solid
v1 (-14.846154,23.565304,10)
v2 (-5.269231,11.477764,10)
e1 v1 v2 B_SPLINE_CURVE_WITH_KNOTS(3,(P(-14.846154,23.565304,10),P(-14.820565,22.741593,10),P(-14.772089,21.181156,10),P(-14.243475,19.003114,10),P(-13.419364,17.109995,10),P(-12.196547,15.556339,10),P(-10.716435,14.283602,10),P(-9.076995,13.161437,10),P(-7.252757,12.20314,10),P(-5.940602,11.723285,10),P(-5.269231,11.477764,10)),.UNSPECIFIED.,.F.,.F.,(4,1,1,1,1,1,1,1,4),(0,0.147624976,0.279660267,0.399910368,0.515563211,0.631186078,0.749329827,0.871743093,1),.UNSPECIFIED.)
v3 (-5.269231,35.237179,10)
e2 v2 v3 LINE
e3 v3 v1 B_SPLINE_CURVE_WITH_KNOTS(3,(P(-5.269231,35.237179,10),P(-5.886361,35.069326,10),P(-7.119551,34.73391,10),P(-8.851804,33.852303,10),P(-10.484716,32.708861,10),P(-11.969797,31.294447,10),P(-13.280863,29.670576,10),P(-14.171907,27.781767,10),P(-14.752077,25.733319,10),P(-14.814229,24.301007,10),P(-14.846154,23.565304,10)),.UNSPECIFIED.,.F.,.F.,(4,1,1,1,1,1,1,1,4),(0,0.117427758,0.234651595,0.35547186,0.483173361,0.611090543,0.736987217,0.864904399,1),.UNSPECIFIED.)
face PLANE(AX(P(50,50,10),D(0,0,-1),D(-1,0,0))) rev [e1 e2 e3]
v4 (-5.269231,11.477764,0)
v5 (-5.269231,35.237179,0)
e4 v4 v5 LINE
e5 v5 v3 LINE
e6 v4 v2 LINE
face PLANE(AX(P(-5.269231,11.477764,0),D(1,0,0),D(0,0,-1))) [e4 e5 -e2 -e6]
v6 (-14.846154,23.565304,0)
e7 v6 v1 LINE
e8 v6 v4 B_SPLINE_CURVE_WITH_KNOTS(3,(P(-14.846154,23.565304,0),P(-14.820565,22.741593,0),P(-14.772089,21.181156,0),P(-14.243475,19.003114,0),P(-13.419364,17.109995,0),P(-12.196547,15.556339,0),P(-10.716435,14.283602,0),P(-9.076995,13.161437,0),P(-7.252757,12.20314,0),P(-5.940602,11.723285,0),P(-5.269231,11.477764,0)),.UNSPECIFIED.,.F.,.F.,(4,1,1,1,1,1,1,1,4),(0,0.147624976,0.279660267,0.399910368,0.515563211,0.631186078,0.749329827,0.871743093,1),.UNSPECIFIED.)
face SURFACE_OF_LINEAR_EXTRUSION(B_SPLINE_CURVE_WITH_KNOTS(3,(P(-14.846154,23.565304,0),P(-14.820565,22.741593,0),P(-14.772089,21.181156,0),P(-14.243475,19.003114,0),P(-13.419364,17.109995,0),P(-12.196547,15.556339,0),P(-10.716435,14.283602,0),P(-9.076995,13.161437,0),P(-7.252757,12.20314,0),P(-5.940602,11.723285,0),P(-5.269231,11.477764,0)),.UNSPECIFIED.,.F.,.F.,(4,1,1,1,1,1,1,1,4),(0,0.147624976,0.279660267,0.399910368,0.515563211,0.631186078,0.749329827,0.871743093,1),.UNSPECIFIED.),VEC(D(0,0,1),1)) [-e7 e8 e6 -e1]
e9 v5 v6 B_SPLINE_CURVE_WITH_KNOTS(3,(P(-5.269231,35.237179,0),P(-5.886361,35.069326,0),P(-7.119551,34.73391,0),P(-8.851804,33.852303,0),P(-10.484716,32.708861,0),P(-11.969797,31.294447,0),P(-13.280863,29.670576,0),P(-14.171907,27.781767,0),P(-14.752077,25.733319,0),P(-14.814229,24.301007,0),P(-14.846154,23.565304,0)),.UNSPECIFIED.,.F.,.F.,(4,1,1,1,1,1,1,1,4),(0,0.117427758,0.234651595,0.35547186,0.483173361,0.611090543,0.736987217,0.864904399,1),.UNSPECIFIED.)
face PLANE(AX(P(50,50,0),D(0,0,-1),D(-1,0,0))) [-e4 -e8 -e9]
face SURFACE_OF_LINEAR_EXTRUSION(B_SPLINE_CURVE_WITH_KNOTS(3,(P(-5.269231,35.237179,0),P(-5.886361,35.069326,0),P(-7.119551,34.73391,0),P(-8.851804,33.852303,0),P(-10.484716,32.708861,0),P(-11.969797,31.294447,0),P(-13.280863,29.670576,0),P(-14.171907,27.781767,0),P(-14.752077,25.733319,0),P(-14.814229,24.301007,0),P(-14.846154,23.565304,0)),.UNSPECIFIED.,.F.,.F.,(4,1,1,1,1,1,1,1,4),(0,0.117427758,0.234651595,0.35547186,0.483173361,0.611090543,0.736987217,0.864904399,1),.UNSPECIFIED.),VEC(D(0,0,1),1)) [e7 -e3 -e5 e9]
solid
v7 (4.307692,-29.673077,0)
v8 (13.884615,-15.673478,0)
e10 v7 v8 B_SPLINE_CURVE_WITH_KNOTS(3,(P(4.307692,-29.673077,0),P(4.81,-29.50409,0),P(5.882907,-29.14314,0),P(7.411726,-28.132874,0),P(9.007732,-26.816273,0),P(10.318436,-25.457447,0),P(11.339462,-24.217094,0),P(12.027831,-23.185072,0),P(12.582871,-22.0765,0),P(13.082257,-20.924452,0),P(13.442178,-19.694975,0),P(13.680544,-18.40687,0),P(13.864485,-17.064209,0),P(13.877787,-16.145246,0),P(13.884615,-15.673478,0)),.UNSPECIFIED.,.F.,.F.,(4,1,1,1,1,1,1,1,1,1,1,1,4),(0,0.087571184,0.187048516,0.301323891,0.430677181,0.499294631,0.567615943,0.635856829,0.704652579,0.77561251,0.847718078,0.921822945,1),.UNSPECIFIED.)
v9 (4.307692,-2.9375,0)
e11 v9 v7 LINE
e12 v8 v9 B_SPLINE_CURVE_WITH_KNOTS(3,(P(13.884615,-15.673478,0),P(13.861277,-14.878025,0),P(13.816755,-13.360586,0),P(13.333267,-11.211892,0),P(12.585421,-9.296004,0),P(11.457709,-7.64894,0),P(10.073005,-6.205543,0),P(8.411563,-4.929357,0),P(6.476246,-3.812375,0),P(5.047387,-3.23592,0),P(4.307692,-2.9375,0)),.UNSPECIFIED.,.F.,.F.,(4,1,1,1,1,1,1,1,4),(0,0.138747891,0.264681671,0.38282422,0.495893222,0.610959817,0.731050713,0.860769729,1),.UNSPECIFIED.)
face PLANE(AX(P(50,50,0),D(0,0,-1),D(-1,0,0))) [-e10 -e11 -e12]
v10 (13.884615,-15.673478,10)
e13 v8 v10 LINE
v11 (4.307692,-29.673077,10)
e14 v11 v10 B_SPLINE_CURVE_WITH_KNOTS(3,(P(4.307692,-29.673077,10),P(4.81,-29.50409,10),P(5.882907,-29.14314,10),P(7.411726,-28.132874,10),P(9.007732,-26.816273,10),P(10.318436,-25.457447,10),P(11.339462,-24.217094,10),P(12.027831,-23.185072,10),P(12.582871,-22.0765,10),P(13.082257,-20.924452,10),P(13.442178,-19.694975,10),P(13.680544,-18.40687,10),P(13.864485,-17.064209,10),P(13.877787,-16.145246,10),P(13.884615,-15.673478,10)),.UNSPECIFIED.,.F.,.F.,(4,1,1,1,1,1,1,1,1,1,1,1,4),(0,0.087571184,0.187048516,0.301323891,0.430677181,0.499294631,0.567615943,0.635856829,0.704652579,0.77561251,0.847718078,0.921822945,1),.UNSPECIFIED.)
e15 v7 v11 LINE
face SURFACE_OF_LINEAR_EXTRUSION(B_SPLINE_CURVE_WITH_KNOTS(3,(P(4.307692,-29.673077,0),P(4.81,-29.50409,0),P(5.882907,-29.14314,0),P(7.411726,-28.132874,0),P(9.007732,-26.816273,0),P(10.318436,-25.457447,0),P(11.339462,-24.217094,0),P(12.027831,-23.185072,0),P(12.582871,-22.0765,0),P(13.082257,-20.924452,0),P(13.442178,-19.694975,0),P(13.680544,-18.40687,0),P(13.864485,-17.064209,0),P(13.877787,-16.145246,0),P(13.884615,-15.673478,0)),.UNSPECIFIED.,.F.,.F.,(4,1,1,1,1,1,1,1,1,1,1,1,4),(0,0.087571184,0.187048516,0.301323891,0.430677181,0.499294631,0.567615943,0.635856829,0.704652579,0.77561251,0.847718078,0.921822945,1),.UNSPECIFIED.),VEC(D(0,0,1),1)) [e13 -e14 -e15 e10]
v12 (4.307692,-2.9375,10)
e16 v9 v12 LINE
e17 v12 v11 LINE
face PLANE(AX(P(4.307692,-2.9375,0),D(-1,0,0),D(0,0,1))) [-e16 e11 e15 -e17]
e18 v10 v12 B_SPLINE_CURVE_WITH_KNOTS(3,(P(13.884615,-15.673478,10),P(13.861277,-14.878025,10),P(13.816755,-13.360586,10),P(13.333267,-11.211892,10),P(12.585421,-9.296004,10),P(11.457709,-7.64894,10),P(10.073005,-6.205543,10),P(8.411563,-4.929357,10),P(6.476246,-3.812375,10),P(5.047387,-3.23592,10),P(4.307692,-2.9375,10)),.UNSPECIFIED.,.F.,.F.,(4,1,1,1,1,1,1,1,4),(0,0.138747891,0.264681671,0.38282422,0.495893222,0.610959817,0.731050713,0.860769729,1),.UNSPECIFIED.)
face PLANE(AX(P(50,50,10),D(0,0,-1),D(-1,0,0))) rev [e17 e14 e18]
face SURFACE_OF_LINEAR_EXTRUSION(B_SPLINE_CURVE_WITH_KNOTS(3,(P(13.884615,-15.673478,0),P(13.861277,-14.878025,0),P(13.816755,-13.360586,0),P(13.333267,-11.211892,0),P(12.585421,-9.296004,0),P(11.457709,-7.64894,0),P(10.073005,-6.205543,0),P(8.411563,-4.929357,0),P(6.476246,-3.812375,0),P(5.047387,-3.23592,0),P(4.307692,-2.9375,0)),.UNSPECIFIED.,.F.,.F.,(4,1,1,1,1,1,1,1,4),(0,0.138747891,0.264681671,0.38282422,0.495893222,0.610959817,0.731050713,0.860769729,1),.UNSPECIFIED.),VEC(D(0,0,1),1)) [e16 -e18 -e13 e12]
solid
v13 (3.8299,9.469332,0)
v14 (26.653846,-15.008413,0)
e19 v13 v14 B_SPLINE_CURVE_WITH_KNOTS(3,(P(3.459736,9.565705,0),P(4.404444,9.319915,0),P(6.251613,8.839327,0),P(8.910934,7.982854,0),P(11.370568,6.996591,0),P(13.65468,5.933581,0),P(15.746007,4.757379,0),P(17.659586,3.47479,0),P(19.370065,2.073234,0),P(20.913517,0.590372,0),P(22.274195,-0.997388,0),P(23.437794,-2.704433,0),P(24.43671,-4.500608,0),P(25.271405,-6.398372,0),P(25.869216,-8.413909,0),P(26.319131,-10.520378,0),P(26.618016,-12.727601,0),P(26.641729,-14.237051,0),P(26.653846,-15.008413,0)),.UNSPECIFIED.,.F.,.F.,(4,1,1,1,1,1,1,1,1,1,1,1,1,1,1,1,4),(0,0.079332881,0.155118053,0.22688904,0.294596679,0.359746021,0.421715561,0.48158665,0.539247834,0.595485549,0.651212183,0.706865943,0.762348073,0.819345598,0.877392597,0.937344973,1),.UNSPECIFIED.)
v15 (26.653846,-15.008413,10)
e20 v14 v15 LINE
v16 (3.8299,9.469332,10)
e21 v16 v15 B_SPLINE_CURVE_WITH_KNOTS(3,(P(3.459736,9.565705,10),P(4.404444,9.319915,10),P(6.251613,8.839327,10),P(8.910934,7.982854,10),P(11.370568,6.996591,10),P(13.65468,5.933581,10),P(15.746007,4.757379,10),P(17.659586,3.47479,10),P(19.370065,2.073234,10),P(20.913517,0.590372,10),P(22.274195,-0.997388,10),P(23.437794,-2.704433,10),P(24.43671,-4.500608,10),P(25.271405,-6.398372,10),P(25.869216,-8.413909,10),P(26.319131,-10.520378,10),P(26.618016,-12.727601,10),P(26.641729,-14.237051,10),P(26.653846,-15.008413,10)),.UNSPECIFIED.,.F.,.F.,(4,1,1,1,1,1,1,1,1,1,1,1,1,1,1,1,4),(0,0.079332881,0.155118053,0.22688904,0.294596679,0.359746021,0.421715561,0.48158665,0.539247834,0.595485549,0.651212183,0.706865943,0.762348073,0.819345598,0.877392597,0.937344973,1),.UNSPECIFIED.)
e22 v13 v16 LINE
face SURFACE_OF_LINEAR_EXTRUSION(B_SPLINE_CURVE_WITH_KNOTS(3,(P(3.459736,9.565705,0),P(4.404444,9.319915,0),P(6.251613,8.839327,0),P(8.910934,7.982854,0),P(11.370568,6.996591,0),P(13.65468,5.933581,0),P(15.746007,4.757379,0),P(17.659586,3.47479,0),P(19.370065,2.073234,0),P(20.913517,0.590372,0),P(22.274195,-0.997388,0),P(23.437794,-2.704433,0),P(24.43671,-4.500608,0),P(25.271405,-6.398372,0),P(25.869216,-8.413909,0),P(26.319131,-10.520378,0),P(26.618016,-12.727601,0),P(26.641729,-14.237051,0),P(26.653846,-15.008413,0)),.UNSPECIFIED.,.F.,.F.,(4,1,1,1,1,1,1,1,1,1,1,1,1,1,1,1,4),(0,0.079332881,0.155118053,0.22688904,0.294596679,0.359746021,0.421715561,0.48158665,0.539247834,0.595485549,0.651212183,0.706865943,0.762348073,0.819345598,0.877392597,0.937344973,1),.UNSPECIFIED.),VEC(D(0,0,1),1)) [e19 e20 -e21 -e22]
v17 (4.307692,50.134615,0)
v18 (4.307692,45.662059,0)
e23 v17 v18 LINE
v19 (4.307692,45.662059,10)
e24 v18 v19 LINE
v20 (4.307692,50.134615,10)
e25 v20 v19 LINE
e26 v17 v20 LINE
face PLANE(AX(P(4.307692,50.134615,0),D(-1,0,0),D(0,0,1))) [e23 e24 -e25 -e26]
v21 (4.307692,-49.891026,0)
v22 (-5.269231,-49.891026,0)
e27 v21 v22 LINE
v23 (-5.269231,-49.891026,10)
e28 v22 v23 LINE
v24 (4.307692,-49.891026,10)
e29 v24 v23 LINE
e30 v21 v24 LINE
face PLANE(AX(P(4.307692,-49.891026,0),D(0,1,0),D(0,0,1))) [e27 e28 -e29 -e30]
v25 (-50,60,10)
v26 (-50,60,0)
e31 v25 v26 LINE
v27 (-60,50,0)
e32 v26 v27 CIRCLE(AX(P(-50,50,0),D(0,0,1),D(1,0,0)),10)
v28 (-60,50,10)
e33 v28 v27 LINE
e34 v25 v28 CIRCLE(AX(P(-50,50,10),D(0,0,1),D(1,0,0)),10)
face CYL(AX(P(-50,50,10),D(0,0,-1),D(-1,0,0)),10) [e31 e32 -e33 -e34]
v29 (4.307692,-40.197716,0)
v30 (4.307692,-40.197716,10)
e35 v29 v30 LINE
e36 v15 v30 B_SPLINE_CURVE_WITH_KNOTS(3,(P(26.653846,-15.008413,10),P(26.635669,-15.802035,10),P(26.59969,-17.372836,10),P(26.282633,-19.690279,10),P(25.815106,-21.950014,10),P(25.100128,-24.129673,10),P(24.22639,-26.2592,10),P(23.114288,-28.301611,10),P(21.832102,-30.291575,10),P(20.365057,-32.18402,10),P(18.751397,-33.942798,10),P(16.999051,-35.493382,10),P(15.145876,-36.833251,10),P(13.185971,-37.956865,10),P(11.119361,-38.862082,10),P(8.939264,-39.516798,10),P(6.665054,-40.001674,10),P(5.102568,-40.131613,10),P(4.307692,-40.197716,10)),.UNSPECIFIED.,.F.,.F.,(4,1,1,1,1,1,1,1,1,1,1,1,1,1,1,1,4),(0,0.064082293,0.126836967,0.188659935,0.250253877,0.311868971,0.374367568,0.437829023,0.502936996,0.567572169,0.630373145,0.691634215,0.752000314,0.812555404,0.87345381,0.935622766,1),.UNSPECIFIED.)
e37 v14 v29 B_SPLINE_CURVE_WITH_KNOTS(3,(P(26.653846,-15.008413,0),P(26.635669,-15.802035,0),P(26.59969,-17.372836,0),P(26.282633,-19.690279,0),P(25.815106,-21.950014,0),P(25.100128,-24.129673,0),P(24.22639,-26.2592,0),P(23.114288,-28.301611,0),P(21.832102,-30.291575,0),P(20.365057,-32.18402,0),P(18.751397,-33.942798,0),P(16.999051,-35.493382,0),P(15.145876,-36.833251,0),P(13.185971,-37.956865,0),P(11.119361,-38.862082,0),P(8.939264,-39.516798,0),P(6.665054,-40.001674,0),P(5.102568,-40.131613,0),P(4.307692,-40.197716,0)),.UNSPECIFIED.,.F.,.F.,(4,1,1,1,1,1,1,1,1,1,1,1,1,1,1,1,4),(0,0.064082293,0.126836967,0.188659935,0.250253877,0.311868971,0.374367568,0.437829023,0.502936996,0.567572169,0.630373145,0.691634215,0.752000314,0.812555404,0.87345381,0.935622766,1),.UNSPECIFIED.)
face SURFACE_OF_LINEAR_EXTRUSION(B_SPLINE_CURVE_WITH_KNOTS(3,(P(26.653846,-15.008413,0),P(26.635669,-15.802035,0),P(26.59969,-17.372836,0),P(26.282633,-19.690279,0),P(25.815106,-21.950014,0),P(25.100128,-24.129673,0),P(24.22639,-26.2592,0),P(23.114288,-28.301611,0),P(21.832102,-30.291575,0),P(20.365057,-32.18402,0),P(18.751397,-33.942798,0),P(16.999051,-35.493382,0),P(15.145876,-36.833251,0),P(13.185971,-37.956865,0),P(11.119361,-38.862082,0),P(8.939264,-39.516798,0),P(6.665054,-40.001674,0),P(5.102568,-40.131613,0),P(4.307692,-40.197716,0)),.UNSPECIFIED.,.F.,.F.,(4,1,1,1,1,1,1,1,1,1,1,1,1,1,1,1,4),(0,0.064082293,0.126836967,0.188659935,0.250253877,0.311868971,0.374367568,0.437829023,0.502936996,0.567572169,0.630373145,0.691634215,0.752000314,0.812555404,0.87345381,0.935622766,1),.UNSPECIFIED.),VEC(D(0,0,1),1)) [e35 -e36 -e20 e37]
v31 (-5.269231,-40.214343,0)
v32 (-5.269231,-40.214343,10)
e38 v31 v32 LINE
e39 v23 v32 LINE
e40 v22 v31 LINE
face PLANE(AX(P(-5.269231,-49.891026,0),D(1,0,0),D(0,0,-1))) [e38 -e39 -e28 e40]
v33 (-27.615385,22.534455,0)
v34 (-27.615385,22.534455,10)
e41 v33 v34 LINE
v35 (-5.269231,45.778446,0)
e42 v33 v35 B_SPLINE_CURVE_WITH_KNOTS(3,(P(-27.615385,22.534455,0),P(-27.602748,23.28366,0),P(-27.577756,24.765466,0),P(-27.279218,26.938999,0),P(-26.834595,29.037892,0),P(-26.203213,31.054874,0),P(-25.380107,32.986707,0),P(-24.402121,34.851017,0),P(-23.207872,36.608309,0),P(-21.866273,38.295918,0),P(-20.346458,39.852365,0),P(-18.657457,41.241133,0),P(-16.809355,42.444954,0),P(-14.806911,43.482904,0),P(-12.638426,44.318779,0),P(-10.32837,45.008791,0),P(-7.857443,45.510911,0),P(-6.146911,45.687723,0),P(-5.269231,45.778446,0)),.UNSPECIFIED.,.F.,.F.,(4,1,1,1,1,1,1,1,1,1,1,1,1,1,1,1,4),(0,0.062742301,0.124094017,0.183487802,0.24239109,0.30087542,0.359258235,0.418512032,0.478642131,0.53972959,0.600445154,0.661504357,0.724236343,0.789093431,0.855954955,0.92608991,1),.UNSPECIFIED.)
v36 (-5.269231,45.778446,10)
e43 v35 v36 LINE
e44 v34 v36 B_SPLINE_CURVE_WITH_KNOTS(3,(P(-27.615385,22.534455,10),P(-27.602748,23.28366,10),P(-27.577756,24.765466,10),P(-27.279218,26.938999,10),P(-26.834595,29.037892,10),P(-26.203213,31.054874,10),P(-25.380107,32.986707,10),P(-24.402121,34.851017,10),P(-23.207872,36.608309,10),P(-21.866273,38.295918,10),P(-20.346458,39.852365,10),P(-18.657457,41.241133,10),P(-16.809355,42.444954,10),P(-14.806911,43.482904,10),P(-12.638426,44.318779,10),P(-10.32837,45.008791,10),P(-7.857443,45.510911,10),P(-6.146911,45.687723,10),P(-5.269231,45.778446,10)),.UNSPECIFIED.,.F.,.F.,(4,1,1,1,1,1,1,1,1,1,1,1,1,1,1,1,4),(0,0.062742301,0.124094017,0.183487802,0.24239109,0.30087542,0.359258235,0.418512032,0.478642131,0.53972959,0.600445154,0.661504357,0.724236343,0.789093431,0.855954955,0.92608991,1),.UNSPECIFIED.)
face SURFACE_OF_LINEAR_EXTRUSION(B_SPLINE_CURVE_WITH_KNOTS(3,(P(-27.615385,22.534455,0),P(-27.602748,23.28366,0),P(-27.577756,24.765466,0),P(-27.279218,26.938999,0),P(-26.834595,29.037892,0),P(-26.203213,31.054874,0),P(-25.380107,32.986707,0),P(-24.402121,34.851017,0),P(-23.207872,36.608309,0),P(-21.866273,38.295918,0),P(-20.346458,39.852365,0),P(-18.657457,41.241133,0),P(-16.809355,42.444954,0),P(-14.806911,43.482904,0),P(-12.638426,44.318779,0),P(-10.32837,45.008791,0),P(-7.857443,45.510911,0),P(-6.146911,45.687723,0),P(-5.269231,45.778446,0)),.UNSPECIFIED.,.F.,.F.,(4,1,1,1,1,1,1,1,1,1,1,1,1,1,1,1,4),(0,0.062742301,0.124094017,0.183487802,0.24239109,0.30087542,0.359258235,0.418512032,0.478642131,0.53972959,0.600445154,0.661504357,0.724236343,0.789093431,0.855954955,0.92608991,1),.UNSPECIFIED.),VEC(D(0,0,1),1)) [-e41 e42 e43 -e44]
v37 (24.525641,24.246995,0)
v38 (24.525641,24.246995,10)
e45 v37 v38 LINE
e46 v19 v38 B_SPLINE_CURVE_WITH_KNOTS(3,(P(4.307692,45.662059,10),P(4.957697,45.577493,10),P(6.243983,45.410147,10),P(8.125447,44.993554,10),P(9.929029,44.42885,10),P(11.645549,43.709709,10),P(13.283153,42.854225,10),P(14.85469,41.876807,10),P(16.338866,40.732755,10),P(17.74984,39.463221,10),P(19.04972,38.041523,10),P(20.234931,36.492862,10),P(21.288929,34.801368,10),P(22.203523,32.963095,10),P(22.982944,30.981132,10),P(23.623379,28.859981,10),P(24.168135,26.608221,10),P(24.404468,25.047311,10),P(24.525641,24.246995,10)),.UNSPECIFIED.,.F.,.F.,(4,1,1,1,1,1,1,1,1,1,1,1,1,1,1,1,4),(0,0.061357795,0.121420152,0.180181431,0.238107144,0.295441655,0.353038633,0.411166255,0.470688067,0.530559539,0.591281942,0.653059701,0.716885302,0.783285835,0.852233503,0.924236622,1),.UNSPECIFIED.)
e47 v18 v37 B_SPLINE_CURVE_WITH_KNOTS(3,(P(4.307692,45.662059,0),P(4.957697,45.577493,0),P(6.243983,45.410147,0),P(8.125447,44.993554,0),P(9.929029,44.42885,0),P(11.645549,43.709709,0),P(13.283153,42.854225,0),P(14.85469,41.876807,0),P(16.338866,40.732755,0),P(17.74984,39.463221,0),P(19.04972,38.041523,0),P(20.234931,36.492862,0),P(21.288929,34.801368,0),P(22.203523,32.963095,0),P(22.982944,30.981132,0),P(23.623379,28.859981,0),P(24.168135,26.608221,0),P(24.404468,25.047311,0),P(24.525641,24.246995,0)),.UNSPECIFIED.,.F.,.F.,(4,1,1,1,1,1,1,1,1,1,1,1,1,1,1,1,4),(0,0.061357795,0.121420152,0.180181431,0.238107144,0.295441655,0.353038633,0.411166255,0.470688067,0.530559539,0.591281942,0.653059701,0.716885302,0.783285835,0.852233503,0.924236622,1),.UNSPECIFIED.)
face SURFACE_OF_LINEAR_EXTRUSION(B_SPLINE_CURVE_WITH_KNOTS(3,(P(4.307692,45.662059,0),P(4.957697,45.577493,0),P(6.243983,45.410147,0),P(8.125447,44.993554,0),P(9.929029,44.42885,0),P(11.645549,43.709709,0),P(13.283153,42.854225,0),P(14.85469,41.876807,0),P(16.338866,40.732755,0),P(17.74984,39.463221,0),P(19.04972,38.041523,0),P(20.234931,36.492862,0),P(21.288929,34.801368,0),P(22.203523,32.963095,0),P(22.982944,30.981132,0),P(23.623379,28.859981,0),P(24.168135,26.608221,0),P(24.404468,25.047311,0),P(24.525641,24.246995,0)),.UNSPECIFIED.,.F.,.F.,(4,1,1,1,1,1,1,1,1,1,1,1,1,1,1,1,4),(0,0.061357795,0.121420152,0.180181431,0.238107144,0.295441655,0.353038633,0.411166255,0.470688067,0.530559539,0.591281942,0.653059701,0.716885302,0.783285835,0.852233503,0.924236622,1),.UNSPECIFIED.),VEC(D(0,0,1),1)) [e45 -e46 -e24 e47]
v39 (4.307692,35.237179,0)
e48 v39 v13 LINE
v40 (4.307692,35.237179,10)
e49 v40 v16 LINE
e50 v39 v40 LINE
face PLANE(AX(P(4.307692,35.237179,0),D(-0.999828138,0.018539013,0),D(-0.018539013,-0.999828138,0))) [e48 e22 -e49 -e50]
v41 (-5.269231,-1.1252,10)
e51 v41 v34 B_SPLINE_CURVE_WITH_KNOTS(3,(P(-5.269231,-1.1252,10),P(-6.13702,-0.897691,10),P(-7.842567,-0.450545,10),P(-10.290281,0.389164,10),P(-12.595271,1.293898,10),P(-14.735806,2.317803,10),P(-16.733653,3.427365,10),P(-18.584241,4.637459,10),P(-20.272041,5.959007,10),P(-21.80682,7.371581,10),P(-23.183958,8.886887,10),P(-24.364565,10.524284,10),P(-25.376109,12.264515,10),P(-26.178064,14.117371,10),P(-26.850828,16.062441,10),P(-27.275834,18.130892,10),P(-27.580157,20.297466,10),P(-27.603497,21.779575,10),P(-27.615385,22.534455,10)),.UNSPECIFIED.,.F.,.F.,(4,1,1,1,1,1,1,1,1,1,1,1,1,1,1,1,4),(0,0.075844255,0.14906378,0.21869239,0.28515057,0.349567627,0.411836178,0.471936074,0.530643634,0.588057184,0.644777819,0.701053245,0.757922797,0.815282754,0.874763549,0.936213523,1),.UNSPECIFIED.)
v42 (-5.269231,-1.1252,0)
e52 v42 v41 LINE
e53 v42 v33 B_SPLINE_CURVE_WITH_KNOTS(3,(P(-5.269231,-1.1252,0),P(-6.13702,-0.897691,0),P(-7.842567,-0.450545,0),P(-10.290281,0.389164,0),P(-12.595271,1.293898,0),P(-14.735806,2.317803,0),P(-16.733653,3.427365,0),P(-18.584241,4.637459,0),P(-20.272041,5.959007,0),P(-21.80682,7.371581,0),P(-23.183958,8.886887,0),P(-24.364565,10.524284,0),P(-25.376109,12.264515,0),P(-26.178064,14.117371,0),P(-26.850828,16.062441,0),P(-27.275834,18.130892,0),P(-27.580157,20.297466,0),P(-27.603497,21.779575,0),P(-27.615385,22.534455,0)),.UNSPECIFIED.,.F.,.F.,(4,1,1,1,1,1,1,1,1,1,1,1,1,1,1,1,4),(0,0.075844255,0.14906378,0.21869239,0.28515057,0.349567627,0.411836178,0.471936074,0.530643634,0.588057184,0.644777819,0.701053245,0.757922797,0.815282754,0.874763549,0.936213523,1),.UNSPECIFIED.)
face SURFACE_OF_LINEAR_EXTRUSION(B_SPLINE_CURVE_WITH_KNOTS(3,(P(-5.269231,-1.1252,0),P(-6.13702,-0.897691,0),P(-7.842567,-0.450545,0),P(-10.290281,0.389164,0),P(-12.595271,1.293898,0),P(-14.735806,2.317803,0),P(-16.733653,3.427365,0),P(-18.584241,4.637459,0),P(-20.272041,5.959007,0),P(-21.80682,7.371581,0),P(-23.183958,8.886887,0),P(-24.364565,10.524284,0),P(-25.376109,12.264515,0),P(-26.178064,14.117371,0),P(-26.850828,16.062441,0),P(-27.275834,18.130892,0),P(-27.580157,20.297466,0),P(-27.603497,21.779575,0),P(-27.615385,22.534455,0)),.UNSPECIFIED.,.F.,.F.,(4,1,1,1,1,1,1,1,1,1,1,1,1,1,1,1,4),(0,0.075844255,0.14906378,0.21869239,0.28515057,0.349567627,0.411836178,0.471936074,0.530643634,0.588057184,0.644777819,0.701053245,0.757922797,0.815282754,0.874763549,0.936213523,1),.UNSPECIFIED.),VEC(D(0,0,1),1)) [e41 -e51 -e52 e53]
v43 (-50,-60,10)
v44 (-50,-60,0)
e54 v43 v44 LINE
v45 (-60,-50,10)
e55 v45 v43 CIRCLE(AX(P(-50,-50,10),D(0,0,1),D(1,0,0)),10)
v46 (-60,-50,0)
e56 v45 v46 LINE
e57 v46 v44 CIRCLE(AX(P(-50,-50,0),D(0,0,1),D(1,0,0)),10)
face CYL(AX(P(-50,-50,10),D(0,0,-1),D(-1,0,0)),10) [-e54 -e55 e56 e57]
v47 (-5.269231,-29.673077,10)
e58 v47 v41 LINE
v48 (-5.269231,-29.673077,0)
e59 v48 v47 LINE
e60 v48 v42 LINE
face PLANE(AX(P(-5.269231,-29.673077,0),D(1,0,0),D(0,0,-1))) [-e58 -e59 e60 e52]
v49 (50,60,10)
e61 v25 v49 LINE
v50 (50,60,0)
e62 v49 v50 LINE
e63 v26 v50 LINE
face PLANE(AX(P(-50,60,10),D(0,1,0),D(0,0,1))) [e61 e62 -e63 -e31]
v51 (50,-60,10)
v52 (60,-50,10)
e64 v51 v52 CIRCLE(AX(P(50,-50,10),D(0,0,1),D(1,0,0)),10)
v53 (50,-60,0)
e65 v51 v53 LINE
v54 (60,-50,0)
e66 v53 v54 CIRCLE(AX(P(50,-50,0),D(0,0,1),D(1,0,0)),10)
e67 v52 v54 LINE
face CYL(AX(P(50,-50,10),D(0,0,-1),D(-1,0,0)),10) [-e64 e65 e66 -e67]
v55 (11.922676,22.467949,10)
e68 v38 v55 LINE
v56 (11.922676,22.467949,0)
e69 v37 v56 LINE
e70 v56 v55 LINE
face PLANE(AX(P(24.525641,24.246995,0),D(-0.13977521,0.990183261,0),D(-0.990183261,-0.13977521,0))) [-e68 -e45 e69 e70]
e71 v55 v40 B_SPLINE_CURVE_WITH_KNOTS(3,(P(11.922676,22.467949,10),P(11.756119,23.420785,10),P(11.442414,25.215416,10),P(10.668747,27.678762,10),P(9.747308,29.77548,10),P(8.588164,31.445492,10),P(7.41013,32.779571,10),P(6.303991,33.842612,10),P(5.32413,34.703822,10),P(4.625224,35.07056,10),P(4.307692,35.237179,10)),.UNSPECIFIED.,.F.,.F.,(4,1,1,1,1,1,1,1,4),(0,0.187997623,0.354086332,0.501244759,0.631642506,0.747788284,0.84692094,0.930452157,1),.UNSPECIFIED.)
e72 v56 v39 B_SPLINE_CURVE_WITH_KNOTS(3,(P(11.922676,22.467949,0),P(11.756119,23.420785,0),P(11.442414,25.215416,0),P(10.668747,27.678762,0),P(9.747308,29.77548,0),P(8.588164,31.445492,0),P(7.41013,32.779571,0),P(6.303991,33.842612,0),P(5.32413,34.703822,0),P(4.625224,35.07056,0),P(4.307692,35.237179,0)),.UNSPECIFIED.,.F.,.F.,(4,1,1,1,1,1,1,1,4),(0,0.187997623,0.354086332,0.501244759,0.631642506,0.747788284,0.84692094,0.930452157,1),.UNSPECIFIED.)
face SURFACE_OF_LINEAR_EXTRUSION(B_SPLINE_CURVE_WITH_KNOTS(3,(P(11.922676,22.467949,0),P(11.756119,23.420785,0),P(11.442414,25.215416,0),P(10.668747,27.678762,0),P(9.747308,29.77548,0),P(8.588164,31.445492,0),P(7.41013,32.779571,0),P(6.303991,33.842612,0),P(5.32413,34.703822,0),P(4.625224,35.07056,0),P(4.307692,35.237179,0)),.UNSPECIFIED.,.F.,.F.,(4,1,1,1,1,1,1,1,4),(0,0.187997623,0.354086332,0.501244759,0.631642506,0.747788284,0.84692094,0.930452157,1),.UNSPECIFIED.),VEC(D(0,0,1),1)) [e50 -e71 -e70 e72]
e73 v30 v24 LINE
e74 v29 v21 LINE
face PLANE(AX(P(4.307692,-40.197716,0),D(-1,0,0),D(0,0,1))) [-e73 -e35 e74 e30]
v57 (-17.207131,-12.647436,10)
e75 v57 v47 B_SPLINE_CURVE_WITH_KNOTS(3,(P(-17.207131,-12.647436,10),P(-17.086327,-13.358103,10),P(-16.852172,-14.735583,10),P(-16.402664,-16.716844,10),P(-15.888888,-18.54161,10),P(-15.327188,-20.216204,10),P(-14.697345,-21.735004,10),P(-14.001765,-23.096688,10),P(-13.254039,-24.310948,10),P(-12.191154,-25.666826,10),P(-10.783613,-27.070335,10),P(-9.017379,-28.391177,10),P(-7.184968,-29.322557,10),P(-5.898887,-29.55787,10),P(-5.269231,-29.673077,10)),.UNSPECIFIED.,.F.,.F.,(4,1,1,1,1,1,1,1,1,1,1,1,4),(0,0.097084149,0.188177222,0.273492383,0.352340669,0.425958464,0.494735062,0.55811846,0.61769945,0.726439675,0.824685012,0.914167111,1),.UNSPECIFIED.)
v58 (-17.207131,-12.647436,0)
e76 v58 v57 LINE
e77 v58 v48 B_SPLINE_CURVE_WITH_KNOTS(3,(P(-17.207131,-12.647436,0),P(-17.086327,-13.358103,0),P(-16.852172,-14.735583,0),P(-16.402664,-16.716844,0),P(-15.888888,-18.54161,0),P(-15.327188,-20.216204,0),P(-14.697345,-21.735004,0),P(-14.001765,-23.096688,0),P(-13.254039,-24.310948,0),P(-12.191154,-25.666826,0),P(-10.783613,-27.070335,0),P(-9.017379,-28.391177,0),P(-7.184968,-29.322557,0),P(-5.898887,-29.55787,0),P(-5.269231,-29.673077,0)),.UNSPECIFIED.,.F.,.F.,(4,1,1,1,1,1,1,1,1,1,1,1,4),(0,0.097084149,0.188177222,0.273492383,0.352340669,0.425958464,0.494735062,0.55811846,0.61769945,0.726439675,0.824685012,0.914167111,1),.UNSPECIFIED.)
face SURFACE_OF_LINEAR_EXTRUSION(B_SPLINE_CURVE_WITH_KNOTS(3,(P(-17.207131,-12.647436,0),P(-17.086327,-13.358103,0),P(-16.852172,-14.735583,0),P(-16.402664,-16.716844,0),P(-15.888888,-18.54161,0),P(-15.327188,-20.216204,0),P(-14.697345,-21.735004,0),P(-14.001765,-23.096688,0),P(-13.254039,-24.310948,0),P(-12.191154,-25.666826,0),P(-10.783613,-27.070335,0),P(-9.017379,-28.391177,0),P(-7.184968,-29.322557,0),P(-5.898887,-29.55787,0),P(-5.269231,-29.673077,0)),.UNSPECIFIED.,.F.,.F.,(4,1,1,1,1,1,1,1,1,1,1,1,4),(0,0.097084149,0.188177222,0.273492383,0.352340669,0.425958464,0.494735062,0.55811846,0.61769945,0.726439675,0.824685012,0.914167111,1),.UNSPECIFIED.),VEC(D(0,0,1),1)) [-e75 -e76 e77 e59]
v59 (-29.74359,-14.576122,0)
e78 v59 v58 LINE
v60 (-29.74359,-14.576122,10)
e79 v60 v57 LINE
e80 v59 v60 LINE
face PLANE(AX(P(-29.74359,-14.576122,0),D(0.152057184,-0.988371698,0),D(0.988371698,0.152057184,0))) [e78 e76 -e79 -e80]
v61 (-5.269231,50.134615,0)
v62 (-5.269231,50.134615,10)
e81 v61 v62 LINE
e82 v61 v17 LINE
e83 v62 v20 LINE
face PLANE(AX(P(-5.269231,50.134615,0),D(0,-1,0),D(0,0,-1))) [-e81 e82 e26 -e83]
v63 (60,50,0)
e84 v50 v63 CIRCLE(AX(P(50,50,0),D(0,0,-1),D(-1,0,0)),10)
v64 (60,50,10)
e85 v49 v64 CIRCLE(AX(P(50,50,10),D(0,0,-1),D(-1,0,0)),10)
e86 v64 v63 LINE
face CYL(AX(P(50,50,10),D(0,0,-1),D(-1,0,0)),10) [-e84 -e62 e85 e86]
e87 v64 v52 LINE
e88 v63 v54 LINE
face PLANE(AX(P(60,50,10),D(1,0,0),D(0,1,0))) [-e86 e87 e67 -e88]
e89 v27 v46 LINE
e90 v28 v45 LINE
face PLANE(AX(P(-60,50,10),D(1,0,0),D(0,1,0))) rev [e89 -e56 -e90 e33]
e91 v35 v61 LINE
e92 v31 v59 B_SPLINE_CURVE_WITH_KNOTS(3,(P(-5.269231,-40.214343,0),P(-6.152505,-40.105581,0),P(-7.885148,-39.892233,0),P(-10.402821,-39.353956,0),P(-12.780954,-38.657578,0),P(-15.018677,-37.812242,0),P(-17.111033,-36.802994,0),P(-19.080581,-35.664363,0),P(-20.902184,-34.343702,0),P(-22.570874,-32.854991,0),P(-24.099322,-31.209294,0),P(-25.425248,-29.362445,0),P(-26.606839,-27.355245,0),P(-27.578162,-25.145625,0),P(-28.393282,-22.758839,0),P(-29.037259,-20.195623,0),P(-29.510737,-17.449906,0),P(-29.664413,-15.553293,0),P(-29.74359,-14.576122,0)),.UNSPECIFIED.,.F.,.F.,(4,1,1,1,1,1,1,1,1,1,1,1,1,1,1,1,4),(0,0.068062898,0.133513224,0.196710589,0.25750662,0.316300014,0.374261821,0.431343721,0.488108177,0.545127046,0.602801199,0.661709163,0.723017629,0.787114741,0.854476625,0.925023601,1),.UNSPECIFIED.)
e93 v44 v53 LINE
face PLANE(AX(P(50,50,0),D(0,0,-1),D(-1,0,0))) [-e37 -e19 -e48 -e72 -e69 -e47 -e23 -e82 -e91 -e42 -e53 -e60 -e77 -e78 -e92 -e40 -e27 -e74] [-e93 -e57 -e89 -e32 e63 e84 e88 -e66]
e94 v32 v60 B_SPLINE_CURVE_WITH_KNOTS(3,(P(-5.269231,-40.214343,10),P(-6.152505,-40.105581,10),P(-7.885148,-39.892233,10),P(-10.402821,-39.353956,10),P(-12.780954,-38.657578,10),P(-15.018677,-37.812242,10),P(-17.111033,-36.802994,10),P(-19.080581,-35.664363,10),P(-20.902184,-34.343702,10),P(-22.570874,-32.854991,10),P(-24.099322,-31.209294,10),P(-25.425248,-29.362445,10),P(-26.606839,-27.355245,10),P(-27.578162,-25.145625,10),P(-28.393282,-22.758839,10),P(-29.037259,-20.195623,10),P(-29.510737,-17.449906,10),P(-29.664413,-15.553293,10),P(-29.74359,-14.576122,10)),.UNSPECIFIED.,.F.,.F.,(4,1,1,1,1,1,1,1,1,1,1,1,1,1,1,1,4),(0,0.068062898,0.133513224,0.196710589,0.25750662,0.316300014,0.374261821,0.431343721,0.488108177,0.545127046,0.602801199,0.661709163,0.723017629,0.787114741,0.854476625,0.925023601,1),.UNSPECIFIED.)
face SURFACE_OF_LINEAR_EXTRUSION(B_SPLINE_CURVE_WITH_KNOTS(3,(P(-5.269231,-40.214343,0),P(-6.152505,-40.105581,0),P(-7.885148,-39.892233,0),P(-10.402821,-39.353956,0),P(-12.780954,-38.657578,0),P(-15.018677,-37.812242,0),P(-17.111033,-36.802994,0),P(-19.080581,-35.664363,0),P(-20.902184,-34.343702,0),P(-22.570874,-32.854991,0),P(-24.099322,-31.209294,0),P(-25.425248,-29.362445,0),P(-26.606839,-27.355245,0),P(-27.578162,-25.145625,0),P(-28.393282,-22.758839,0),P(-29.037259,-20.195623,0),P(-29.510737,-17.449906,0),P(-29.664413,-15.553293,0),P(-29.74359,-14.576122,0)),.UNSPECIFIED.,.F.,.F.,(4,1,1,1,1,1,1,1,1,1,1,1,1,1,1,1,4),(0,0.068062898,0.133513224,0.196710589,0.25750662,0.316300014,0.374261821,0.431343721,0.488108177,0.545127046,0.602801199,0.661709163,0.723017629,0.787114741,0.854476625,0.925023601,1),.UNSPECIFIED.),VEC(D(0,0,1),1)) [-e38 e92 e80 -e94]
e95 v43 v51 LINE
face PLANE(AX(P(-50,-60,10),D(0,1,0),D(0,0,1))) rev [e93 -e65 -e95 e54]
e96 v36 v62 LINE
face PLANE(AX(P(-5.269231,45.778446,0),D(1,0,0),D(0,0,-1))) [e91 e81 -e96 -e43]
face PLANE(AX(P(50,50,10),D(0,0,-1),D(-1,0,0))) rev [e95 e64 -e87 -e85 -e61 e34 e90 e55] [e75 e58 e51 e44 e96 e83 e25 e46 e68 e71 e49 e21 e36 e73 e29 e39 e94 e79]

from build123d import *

# Parameters (mm, degrees)
BOSS_EXTRUDE1_DEPTH = 10
CUT_EXTRUDE12_START = -10
CUT_EXTRUDE12_DEPTH = 10


# Read off the part's stored shape, not the designer's step: Cut-Extrude12
with BuildPart() as part:
    # Sketch1 → Boss-Extrude1 (new body)
    with BuildSketch(Plane.XY):
        with BuildLine():
            Line((-50, 60), (50, 60))
            ThreePointArc((50, 60), (57.071067812, 57.071067812), (60, 50))
            Line((60, 50), (60, -50))
            ThreePointArc((60, -50), (57.071067812, -57.071067812), (50, -60))
            Line((50, -60), (-50, -60))
            ThreePointArc((-50, -60), (-57.071067812, -57.071067812), (-60, -50))
            Line((-60, -50), (-60, 50))
            ThreePointArc((-60, 50), (-57.071067812, 57.071067812), (-50, 60))
        make_face()
    extrude(amount=BOSS_EXTRUDE1_DEPTH)

    # Cut-Extrude12 outline → Cut-Extrude12 (cut)
    with BuildSketch(Plane.XY.offset(10).offset(CUT_EXTRUDE12_START)):
        with BuildLine():
            add(Edge.make_bspline(
                [(3.829899736, 9.469331853), (4.651101258, 9.255238705), (6.373065179, 8.800211267), (8.910934261, 7.982854414), (11.370568201, 6.996591048), (13.654680469, 5.93358143), (15.746006939, 4.757378698), (17.659586078, 3.474790317), (19.370064675, 2.073234039), (20.913516847, 0.590371796), (22.274195276, -0.997388115), (23.43779351, -2.704433385), (24.436709807, -4.500607784), (25.271405111, -6.398372377), (25.869216217, -8.413908853), (26.31913094, -10.520378408), (26.618016027, -12.727600555), (26.641728545, -14.23705148), (26.653846154, -15.008413462)],
                knots=[0.01036212, 0.01036212, 0.01036212, 0.01036212, 0.079332881, 0.155118053, 0.22688904, 0.294596679, 0.359746021, 0.421715561, 0.48158665, 0.539247834, 0.595485549, 0.651212183, 0.706865943, 0.762348073, 0.819345598, 0.877392597, 0.937344973, 1, 1, 1, 1], degree=3))
            Line((3.829899736, 9.469331853), (4.307692308, 35.237179487))
            add(Edge.make_bspline(
                [(11.922676282, 22.467948718), (11.756118771, 23.42078508), (11.442414071, 25.215415917), (10.668746906, 27.678761902), (9.747307562, 29.775480397), (8.588163562, 31.445492494), (7.410130151, 32.779570621), (6.303990971, 33.842612469), (5.324129932, 34.703821515), (4.625223761, 35.070560378), (4.307692308, 35.237179487)],
                knots=[0, 0, 0, 0, 0.187997623, 0.354086332, 0.501244759, 0.631642506, 0.747788284, 0.84692094, 0.930452157, 1, 1, 1, 1], degree=3))
            Line((11.922676282, 22.467948718), (24.525641026, 24.246995192))
            add(Edge.make_bspline(
                [(4.307692308, 45.662059295), (4.957696866, 45.577493429), (6.243982537, 45.410147125), (8.125446929, 44.993554081), (9.92902863, 44.428849803), (11.645548985, 43.709709033), (13.28315267, 42.854224926), (14.85468999, 41.876807221), (16.338865776, 40.732755063), (17.749840099, 39.463220808), (19.049720083, 38.041523481), (20.234930756, 36.492862307), (21.288928545, 34.80136789), (22.203523076, 32.963095038), (22.982943743, 30.98113234), (23.623379472, 28.859981153), (24.168134589, 26.608221373), (24.404467535, 25.047310905), (24.525641026, 24.246995192)],
                knots=[0, 0, 0, 0, 0.061357795, 0.121420152, 0.180181431, 0.238107144, 0.295441655, 0.353038633, 0.411166255, 0.470688067, 0.530559539, 0.591281942, 0.653059701, 0.716885302, 0.783285835, 0.852233503, 0.924236622, 1, 1, 1, 1], degree=3))
            Line((4.307692308, 45.662059295), (4.307692308, 50.134615385))
            Line((4.307692308, 50.134615385), (-5.269230769, 50.134615385))
            Line((-5.269230769, 50.134615385), (-5.269230769, 45.778445513))
            add(Edge.make_bspline(
                [(-27.615384615, 22.534455128), (-27.602748482, 23.283660324), (-27.577756275, 24.765465769), (-27.279217809, 26.938999246), (-26.834595345, 29.037892018), (-26.203213071, 31.054874397), (-25.380107075, 32.98670666), (-24.402120944, 34.851017323), (-23.207872424, 36.608309251), (-21.866273289, 38.295918436), (-20.346458111, 39.852364991), (-18.657456687, 41.24113319), (-16.809355132, 42.444954007), (-14.806911484, 43.482903512), (-12.638425501, 44.318779361), (-10.328369652, 45.008790952), (-7.857443216, 45.510911003), (-6.146911468, 45.687722715), (-5.269230769, 45.778445513)],
                knots=[0, 0, 0, 0, 0.062742301, 0.124094017, 0.183487802, 0.24239109, 0.30087542, 0.359258235, 0.418512032, 0.478642131, 0.53972959, 0.600445154, 0.661504357, 0.724236343, 0.789093431, 0.855954955, 0.92608991, 1, 1, 1, 1], degree=3))
            add(Edge.make_bspline(
                [(-5.269230769, -1.125200321), (-6.137019995, -0.897690659), (-7.842567008, -0.450544727), (-10.290281253, 0.389164268), (-12.595271169, 1.293897806), (-14.73580601, 2.317802511), (-16.733652862, 3.42736479), (-18.584240651, 4.637458518), (-20.27204064, 5.959006773), (-21.806820404, 7.371581142), (-23.183957959, 8.886886999), (-24.364565463, 10.524284334), (-25.376108886, 12.264514626), (-26.178064087, 14.117370849), (-26.850827695, 16.062441252), (-27.275834031, 18.130892044), (-27.580156931, 20.297465856), (-27.603496905, 21.779574935), (-27.615384615, 22.534455128)],
                knots=[0, 0, 0, 0, 0.075844255, 0.14906378, 0.21869239, 0.28515057, 0.349567627, 0.411836178, 0.471936074, 0.530643634, 0.588057184, 0.644777819, 0.701053245, 0.757922797, 0.815282754, 0.874763549, 0.936213523, 1, 1, 1, 1], degree=3))
            Line((-5.269230769, -1.125200321), (-5.269230769, -29.673076923))
            add(Edge.make_bspline(
                [(-17.20713141, -12.647435897), (-17.08632667, -13.358103486), (-16.852172066, -14.735583268), (-16.402664345, -16.716844049), (-15.888887925, -18.541610498), (-15.327187544, -20.216203966), (-14.697345018, -21.735003901), (-14.001765082, -23.096687891), (-13.254039271, -24.310948037), (-12.191153535, -25.66682637), (-10.783612806, -27.070335372), (-9.01737936, -28.391176881), (-7.184967958, -29.322557123), (-5.898886501, -29.557869679), (-5.269230769, -29.673076923)],
                knots=[0, 0, 0, 0, 0.097084149, 0.188177222, 0.273492383, 0.352340669, 0.425958464, 0.494735062, 0.55811846, 0.61769945, 0.726439675, 0.824685012, 0.914167111, 1, 1, 1, 1], degree=3))
            Line((-17.20713141, -12.647435897), (-29.743589744, -14.576121795))
            add(Edge.make_bspline(
                [(-5.269230769, -40.214342949), (-6.152504611, -40.105581471), (-7.885148124, -39.892233289), (-10.402821078, -39.353955628), (-12.780954336, -38.657577725), (-15.018676957, -37.812241533), (-17.111032946, -36.802994053), (-19.08058104, -35.664362641), (-20.902183607, -34.343702464), (-22.570873783, -32.854991024), (-24.099322265, -31.209293922), (-25.42524832, -29.362444966), (-26.606838728, -27.355244963), (-27.578162277, -25.145624763), (-28.393281812, -22.758838626), (-29.037258654, -20.195622566), (-29.510737122, -17.449905769), (-29.664413014, -15.553292744), (-29.743589744, -14.576121795)],
                knots=[0, 0, 0, 0, 0.068062898, 0.133513224, 0.196710589, 0.25750662, 0.316300014, 0.374261821, 0.431343721, 0.488108177, 0.545127046, 0.602801199, 0.661709163, 0.723017629, 0.787114741, 0.854476625, 0.925023601, 1, 1, 1, 1], degree=3))
            Line((-5.269230769, -40.214342949), (-5.269230769, -49.891025641))
            Line((-5.269230769, -49.891025641), (4.307692308, -49.891025641))
            Line((4.307692308, -49.891025641), (4.307692308, -40.197716346))
            add(Edge.make_bspline(
                [(26.653846154, -15.008413462), (26.635668711, -15.802035053), (26.599690415, -17.372836449), (26.282633466, -19.690279279), (25.815106337, -21.950014152), (25.100127809, -24.129672631), (24.226389701, -26.259199608), (23.114288353, -28.301611461), (21.832102403, -30.291574777), (20.365057121, -32.184020449), (18.751397428, -33.942797936), (16.999051073, -35.49338187), (15.145875566, -36.833250571), (13.185970917, -37.956865389), (11.119361206, -38.862081523), (8.939264471, -39.516798484), (6.665053749, -40.001673764), (5.102568108, -40.131612989), (4.307692308, -40.197716346)],
                knots=[0, 0, 0, 0, 0.064082293, 0.126836967, 0.188659935, 0.250253877, 0.311868971, 0.374367568, 0.437829023, 0.502936996, 0.567572169, 0.630373145, 0.691634215, 0.752000314, 0.812555404, 0.87345381, 0.935622766, 1, 1, 1, 1], degree=3))
        make_face()
        with BuildLine():
            add(Edge.make_bspline(
                [(4.307692308, -29.673076923), (4.809999517, -29.50408965), (5.882907448, -29.143139653), (7.411725674, -28.132874023), (9.00773224, -26.816272645), (10.3184365, -25.45744691), (11.339462013, -24.217093709), (12.027830838, -23.185071901), (12.58287141, -22.076500272), (13.082257467, -20.924452078), (13.442178397, -19.69497539), (13.680544359, -18.406870485), (13.864485194, -17.064209311), (13.877786755, -16.145246178), (13.884615385, -15.673477564)],
                knots=[0, 0, 0, 0, 0.087571184, 0.187048516, 0.301323891, 0.430677181, 0.499294631, 0.567615943, 0.635856829, 0.704652579, 0.77561251, 0.847718078, 0.921822945, 1, 1, 1, 1], degree=3))
            Line((4.307692308, -29.673076923), (4.307692308, -2.9375))
            add(Edge.make_bspline(
                [(13.884615385, -15.673477564), (13.861276644, -14.878025485), (13.816754622, -13.360585586), (13.33326714, -11.211891668), (12.585421154, -9.296003879), (11.4577088, -7.648939589), (10.073004894, -6.205542924), (8.411562501, -4.929357307), (6.476245927, -3.81237526), (5.047387135, -3.23592043), (4.307692308, -2.9375)],
                knots=[0, 0, 0, 0, 0.138747891, 0.264681671, 0.38282422, 0.495893222, 0.610959817, 0.731050713, 0.860769729, 1, 1, 1, 1], degree=3))
        make_face(mode=Mode.SUBTRACT)
        with BuildLine():
            add(Edge.make_bspline(
                [(-5.269230769, 35.237179487), (-5.886361442, 35.069325676), (-7.119551097, 34.733909545), (-8.851804055, 33.852303433), (-10.484715507, 32.708860722), (-11.969797, 31.294446838), (-13.280862837, 29.670576278), (-14.171907462, 27.781767485), (-14.752076649, 25.733319294), (-14.814229335, 24.301006812), (-14.846153846, 23.565304487)],
                knots=[0, 0, 0, 0, 0.117427758, 0.234651595, 0.35547186, 0.483173361, 0.611090543, 0.736987217, 0.864904399, 1, 1, 1, 1], degree=3))
            Line((-5.269230769, 35.237179487), (-5.269230769, 11.477764423))
            add(Edge.make_bspline(
                [(-14.846153846, 23.565304487), (-14.820564775, 22.741592722), (-14.772088924, 21.181155869), (-14.243474845, 19.003113998), (-13.419363639, 17.109994682), (-12.196547416, 15.556339307), (-10.716435235, 14.283601685), (-9.076995365, 13.161437362), (-7.252756905, 12.203139512), (-5.940602494, 11.723284921), (-5.269230769, 11.477764423)],
                knots=[0, 0, 0, 0, 0.147624976, 0.279660267, 0.399910368, 0.515563211, 0.631186078, 0.749329827, 0.871743093, 1, 1, 1, 1], degree=3))
        make_face(mode=Mode.SUBTRACT)
    extrude(amount=CUT_EXTRUDE12_DEPTH, mode=Mode.SUBTRACT)


solid = part.part
